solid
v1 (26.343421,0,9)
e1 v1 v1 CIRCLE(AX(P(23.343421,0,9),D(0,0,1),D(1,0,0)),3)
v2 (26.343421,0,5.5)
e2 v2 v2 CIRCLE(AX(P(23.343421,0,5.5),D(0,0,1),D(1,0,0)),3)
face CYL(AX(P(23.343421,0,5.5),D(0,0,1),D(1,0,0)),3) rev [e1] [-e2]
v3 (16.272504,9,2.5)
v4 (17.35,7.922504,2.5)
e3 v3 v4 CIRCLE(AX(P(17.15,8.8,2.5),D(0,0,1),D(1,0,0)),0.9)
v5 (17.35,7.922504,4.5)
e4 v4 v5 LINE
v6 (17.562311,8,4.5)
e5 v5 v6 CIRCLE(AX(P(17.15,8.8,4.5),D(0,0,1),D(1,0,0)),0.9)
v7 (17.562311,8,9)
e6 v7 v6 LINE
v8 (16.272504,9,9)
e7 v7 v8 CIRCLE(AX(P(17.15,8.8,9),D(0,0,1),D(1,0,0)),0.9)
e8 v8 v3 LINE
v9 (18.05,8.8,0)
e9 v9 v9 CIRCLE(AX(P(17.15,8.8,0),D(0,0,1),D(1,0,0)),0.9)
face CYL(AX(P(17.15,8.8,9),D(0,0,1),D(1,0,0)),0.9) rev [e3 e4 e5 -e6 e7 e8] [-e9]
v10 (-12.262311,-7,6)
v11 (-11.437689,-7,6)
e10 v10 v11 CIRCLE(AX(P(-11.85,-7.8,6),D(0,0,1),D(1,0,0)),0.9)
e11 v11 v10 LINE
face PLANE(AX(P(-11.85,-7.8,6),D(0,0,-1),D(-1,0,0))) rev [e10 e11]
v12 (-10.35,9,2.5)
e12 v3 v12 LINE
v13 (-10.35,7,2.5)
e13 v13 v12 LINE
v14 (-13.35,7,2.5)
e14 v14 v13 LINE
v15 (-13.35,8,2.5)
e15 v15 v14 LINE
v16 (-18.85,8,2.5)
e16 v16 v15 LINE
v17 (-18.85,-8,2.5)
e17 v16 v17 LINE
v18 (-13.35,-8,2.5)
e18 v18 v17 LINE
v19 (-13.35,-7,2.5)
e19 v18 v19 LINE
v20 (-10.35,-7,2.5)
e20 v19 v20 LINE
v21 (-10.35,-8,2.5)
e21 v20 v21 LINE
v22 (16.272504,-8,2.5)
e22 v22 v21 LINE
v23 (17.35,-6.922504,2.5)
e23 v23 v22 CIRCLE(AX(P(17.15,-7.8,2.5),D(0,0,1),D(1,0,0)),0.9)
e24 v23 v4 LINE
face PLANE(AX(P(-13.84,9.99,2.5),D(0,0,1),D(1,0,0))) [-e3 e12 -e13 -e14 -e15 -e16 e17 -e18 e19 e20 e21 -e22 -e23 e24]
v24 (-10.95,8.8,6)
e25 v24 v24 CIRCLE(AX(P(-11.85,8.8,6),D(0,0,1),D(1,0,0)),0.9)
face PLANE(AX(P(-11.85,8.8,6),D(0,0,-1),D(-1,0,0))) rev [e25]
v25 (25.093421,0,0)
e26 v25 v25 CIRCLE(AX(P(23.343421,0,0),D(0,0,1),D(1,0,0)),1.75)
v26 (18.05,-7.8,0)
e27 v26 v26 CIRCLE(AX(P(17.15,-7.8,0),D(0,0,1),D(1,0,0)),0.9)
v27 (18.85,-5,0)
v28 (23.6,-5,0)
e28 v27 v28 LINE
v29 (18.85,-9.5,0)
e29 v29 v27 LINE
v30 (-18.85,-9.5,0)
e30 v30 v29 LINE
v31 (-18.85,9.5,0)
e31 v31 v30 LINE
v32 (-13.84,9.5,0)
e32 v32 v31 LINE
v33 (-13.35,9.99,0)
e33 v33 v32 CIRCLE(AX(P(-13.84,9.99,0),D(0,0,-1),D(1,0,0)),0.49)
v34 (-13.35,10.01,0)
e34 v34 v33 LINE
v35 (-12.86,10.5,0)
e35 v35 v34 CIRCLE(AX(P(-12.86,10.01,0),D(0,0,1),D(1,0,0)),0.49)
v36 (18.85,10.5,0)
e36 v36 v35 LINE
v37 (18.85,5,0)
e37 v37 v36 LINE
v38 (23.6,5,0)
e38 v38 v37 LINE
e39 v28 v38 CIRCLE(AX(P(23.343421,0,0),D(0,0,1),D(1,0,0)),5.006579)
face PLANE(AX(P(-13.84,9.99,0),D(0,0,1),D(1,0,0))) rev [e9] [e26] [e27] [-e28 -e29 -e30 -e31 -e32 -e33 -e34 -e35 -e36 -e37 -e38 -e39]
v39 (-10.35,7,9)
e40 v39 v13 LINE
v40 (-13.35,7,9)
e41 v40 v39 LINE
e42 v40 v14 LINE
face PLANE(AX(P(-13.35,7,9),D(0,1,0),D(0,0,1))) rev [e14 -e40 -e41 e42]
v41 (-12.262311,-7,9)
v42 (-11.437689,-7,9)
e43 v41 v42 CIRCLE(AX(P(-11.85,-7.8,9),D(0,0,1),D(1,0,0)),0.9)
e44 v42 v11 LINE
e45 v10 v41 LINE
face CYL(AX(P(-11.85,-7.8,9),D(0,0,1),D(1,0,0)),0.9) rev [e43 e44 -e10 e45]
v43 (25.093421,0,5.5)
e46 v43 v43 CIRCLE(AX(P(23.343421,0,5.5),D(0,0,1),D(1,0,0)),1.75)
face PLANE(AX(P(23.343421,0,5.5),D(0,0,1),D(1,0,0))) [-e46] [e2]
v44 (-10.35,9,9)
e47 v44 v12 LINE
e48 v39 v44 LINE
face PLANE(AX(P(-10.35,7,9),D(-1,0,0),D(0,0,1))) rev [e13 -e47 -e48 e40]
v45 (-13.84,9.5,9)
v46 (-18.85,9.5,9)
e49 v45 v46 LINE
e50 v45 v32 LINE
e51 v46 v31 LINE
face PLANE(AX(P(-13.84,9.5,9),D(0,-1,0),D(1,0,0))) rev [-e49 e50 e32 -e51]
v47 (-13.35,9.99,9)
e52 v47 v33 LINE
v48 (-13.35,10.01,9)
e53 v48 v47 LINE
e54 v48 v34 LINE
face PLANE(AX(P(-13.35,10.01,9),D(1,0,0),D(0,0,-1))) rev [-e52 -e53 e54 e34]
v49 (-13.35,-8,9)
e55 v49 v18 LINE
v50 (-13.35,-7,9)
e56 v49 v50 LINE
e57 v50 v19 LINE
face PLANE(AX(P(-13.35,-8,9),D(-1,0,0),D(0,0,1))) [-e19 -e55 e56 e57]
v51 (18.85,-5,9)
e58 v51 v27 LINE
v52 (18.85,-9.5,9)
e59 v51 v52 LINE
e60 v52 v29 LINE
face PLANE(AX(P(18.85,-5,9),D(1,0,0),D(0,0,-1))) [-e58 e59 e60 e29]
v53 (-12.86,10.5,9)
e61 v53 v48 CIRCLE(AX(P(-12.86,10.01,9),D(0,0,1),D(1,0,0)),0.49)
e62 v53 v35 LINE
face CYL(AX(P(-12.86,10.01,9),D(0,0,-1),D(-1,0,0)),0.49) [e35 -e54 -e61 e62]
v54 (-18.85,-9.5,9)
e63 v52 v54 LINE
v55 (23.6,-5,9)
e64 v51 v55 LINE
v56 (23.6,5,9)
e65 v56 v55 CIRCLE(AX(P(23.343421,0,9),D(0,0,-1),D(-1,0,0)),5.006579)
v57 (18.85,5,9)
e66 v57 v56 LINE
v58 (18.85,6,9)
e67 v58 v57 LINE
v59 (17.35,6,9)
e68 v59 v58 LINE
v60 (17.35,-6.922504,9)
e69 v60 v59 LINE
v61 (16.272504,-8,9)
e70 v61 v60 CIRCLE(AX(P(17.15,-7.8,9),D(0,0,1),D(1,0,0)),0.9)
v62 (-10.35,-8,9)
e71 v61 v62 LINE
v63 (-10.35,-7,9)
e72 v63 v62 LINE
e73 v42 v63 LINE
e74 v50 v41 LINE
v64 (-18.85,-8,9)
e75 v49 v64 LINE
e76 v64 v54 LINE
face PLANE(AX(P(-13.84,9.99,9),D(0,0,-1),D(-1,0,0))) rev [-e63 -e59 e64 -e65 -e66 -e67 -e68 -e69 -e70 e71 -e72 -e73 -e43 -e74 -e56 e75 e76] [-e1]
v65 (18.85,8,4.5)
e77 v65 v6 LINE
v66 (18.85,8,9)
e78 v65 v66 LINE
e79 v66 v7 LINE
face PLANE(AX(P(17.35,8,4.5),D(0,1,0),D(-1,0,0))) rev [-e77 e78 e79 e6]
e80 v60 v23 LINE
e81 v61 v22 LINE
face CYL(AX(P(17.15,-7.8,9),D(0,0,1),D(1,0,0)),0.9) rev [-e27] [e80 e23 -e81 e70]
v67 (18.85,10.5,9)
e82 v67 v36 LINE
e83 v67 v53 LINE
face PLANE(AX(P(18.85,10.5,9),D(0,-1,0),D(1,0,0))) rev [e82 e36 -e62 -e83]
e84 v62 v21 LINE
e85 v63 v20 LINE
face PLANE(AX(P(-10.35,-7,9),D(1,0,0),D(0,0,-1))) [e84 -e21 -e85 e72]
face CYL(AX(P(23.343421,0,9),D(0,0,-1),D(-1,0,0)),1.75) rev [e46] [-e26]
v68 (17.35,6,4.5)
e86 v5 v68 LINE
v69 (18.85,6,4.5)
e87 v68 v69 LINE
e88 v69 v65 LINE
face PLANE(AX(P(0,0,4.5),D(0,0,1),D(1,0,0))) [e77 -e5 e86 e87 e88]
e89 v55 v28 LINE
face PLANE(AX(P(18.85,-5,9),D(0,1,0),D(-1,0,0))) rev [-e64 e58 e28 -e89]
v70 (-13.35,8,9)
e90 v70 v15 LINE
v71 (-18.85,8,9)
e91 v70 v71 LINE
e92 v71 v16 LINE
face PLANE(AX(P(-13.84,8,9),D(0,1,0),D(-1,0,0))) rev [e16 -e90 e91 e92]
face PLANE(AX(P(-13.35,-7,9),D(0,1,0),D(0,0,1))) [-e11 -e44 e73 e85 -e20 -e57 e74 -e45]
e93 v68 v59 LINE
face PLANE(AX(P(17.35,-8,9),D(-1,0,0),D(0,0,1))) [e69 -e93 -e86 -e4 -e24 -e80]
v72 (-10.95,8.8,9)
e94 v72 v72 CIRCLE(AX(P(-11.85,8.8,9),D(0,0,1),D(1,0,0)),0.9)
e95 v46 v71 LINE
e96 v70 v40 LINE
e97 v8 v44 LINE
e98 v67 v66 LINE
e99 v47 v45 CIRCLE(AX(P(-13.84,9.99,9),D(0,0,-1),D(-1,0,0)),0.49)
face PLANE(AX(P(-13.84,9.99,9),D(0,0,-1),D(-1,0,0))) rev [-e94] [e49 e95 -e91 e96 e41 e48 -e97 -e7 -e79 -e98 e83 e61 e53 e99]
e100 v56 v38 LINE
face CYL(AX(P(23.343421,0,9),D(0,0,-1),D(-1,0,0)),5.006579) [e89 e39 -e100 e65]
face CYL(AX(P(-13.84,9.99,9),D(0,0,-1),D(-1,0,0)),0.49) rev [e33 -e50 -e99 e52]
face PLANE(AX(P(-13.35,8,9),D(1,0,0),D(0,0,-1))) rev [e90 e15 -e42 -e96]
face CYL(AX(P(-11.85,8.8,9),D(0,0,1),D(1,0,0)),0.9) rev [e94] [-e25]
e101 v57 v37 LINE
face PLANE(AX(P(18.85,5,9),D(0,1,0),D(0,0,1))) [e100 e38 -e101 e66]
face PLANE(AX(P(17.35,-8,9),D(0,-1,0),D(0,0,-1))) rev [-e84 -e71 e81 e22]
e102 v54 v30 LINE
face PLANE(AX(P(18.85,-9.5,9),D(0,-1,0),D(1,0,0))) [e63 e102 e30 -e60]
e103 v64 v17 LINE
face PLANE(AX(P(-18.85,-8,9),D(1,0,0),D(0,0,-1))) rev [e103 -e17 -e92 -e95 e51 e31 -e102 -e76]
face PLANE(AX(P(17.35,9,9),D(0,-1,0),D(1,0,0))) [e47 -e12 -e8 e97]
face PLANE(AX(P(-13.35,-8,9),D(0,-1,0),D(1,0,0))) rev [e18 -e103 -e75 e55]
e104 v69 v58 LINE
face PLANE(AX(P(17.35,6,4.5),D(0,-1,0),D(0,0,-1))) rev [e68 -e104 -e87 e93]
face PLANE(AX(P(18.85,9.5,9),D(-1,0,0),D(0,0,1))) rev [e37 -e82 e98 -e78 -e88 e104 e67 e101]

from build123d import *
from build123d.topology import SkipClean

# Parameters (mm, degrees)
SKETCH1_R                        = 1.75
BOSS_EXTRUDE1_DEPTH              = 7.5
SKETCH2_R                        = 1.75
BOSS_EXTRUDE2_DEPTH              = 2.5
SKETCH3_W                        = 1.5
SKETCH3_H                        = 2
CUT_EXTRUDE1_DEPTH               = 4.5
SKETCH4_R                        = 3
CUT_EXTRUDE2_DEPTH               = 3.5
M1_6_CLEARANCE_HOLE1_OUTLINE_R   = 0.9
M1_6_CLEARANCE_HOLE1_DEPTH       = 9
M1_6_START                       = 6
M1_6_CLEARANCE_HOLE1_2_OUTLINE_R = 0.9
M1_6_CLEARANCE_HOLE1_2_DEPTH     = 3


# Read off the part's stored shape, not the designer's step: M1.6 Clearance Hole1
with BuildPart() as part:
    # Sketch1 → Boss-Extrude1 (new body)
    with BuildSketch(Plane.XY.offset(1.5)):
        with BuildLine():
            Line((18.85, -9.5), (-18.85, -9.5))
            Line((-18.85, -9.5), (-18.85, -8))
            Line((-18.85, -8), (-13.35, -8))
            Line((-13.35, -8), (-13.35, -7))
            Line((-13.35, -7), (-10.35, -7))
            Line((-10.35, -7), (-10.35, -8))
            Line((-10.35, -8), (17.35, -8))
            Line((17.35, -8), (17.35, 9))
            Line((17.35, 9), (-10.35, 9))
            Line((-10.35, 9), (-10.35, 7))
            Line((-10.35, 7), (-13.35, 7))
            Line((-13.35, 7), (-13.35, 8))
            Line((-13.35, 8), (-13.84, 8))
            Line((-13.84, 8), (-18.85, 8))
            Line((-18.85, 8), (-18.85, 9.5))
            Line((-18.85, 9.5), (-13.84, 9.5))
            ThreePointArc((-13.84, 9.5), (-13.493517677, 9.643517677), (-13.35, 9.99))
            Line((-13.35, 9.99), (-13.35, 10.01))
            ThreePointArc((-13.35, 10.01), (-13.206482323, 10.356482323), (-12.86, 10.5))
            Line((-12.86, 10.5), (18.85, 10.5))
            Line((18.85, 10.5), (18.85, 9.5))
            Line((18.85, 9.5), (18.85, 5))
            Line((18.85, 5), (23.6, 5))
            ThreePointArc((23.6, 5), (28.35, 0), (23.6, -5))
            Line((23.6, -5), (18.85, -5))
            Line((18.85, -5), (18.85, -9.5))
        make_face()
        with Locations((23.343421053, 0)):
            Circle(SKETCH1_R, mode=Mode.SUBTRACT)
    extrude(amount=BOSS_EXTRUDE1_DEPTH)

    # Sketch2 → Boss-Extrude2 (add)
    with SkipClean():  # the faces are left unmerged after this step: merging them gives an invalid solid
        with BuildSketch(Plane.XY):
            with BuildLine():
                Line((-18.85, 8), (-18.85, -8))
                Line((-18.85, -8), (-18.85, -9.5))
                Line((-18.85, -9.5), (18.85, -9.5))
                Line((18.85, -9.5), (18.85, -5))
                Line((18.85, -5), (23.6, -5))
                ThreePointArc((23.6, -5), (28.35, 0), (23.6, 5))
                Line((23.6, 5), (18.85, 5))
                Line((18.85, 5), (18.85, 10.5))
                Line((18.85, 10.5), (-12.86, 10.5))
                ThreePointArc((-12.86, 10.5), (-13.206482323, 10.356482323), (-13.35, 10.01))
                Line((-13.35, 10.01), (-13.35, 9.99))
                ThreePointArc((-13.35, 9.99), (-13.493517677, 9.643517677), (-13.84, 9.5))
                Line((-13.84, 9.5), (-18.85, 9.5))
                Line((-18.85, 9.5), (-18.85, 8))
            make_face()
            with Locations((23.343421053, 0)):
                Circle(SKETCH2_R, mode=Mode.SUBTRACT)
        extrude(amount=BOSS_EXTRUDE2_DEPTH)
    add(part.part.scale(1), mode=Mode.REPLACE)  # the faces are merged on a copy

    # Sketch3 → Cut-Extrude1 (cut)
    with BuildSketch(Plane.XY.offset(9)):
        with Locations((18.1, 7)):
            Rectangle(SKETCH3_W, SKETCH3_H)
    extrude(amount=-CUT_EXTRUDE1_DEPTH, mode=Mode.SUBTRACT)

    # Sketch4 → Cut-Extrude2 (cut)
    with BuildSketch(Plane.XY.offset(9)):
        with Locations((23.343421053, 0)):
            Circle(SKETCH4_R)
    extrude(amount=-CUT_EXTRUDE2_DEPTH, mode=Mode.SUBTRACT)

    # M1.6 Clearance Hole1 outline → M1.6 Clearance Hole1 (cut)
    with BuildSketch(Plane.XY):
        with Locations((17.15, 8.8)):
            Circle(M1_6_CLEARANCE_HOLE1_OUTLINE_R)
        with Locations((17.15, -7.8)):
            Circle(M1_6_CLEARANCE_HOLE1_OUTLINE_R)
    extrude(amount=M1_6_CLEARANCE_HOLE1_DEPTH, mode=Mode.SUBTRACT)

    # M1.6 Clearance Hole1 2 outline → M1.6 Clearance Hole1 2 (cut)
    with BuildSketch(Plane.XY.offset(M1_6_START)):
        with BuildLine():
            Line((-11.437689437, -7), (-12.262310563, -7))
            ThreePointArc((-12.262310563, -7), (-11.85, -8.7), (-11.437689437, -7))
        make_face()
        with Locations((-11.85, 8.8)):
            Circle(M1_6_CLEARANCE_HOLE1_2_OUTLINE_R)
    extrude(amount=M1_6_CLEARANCE_HOLE1_2_DEPTH, mode=Mode.SUBTRACT)


solid = part.part
